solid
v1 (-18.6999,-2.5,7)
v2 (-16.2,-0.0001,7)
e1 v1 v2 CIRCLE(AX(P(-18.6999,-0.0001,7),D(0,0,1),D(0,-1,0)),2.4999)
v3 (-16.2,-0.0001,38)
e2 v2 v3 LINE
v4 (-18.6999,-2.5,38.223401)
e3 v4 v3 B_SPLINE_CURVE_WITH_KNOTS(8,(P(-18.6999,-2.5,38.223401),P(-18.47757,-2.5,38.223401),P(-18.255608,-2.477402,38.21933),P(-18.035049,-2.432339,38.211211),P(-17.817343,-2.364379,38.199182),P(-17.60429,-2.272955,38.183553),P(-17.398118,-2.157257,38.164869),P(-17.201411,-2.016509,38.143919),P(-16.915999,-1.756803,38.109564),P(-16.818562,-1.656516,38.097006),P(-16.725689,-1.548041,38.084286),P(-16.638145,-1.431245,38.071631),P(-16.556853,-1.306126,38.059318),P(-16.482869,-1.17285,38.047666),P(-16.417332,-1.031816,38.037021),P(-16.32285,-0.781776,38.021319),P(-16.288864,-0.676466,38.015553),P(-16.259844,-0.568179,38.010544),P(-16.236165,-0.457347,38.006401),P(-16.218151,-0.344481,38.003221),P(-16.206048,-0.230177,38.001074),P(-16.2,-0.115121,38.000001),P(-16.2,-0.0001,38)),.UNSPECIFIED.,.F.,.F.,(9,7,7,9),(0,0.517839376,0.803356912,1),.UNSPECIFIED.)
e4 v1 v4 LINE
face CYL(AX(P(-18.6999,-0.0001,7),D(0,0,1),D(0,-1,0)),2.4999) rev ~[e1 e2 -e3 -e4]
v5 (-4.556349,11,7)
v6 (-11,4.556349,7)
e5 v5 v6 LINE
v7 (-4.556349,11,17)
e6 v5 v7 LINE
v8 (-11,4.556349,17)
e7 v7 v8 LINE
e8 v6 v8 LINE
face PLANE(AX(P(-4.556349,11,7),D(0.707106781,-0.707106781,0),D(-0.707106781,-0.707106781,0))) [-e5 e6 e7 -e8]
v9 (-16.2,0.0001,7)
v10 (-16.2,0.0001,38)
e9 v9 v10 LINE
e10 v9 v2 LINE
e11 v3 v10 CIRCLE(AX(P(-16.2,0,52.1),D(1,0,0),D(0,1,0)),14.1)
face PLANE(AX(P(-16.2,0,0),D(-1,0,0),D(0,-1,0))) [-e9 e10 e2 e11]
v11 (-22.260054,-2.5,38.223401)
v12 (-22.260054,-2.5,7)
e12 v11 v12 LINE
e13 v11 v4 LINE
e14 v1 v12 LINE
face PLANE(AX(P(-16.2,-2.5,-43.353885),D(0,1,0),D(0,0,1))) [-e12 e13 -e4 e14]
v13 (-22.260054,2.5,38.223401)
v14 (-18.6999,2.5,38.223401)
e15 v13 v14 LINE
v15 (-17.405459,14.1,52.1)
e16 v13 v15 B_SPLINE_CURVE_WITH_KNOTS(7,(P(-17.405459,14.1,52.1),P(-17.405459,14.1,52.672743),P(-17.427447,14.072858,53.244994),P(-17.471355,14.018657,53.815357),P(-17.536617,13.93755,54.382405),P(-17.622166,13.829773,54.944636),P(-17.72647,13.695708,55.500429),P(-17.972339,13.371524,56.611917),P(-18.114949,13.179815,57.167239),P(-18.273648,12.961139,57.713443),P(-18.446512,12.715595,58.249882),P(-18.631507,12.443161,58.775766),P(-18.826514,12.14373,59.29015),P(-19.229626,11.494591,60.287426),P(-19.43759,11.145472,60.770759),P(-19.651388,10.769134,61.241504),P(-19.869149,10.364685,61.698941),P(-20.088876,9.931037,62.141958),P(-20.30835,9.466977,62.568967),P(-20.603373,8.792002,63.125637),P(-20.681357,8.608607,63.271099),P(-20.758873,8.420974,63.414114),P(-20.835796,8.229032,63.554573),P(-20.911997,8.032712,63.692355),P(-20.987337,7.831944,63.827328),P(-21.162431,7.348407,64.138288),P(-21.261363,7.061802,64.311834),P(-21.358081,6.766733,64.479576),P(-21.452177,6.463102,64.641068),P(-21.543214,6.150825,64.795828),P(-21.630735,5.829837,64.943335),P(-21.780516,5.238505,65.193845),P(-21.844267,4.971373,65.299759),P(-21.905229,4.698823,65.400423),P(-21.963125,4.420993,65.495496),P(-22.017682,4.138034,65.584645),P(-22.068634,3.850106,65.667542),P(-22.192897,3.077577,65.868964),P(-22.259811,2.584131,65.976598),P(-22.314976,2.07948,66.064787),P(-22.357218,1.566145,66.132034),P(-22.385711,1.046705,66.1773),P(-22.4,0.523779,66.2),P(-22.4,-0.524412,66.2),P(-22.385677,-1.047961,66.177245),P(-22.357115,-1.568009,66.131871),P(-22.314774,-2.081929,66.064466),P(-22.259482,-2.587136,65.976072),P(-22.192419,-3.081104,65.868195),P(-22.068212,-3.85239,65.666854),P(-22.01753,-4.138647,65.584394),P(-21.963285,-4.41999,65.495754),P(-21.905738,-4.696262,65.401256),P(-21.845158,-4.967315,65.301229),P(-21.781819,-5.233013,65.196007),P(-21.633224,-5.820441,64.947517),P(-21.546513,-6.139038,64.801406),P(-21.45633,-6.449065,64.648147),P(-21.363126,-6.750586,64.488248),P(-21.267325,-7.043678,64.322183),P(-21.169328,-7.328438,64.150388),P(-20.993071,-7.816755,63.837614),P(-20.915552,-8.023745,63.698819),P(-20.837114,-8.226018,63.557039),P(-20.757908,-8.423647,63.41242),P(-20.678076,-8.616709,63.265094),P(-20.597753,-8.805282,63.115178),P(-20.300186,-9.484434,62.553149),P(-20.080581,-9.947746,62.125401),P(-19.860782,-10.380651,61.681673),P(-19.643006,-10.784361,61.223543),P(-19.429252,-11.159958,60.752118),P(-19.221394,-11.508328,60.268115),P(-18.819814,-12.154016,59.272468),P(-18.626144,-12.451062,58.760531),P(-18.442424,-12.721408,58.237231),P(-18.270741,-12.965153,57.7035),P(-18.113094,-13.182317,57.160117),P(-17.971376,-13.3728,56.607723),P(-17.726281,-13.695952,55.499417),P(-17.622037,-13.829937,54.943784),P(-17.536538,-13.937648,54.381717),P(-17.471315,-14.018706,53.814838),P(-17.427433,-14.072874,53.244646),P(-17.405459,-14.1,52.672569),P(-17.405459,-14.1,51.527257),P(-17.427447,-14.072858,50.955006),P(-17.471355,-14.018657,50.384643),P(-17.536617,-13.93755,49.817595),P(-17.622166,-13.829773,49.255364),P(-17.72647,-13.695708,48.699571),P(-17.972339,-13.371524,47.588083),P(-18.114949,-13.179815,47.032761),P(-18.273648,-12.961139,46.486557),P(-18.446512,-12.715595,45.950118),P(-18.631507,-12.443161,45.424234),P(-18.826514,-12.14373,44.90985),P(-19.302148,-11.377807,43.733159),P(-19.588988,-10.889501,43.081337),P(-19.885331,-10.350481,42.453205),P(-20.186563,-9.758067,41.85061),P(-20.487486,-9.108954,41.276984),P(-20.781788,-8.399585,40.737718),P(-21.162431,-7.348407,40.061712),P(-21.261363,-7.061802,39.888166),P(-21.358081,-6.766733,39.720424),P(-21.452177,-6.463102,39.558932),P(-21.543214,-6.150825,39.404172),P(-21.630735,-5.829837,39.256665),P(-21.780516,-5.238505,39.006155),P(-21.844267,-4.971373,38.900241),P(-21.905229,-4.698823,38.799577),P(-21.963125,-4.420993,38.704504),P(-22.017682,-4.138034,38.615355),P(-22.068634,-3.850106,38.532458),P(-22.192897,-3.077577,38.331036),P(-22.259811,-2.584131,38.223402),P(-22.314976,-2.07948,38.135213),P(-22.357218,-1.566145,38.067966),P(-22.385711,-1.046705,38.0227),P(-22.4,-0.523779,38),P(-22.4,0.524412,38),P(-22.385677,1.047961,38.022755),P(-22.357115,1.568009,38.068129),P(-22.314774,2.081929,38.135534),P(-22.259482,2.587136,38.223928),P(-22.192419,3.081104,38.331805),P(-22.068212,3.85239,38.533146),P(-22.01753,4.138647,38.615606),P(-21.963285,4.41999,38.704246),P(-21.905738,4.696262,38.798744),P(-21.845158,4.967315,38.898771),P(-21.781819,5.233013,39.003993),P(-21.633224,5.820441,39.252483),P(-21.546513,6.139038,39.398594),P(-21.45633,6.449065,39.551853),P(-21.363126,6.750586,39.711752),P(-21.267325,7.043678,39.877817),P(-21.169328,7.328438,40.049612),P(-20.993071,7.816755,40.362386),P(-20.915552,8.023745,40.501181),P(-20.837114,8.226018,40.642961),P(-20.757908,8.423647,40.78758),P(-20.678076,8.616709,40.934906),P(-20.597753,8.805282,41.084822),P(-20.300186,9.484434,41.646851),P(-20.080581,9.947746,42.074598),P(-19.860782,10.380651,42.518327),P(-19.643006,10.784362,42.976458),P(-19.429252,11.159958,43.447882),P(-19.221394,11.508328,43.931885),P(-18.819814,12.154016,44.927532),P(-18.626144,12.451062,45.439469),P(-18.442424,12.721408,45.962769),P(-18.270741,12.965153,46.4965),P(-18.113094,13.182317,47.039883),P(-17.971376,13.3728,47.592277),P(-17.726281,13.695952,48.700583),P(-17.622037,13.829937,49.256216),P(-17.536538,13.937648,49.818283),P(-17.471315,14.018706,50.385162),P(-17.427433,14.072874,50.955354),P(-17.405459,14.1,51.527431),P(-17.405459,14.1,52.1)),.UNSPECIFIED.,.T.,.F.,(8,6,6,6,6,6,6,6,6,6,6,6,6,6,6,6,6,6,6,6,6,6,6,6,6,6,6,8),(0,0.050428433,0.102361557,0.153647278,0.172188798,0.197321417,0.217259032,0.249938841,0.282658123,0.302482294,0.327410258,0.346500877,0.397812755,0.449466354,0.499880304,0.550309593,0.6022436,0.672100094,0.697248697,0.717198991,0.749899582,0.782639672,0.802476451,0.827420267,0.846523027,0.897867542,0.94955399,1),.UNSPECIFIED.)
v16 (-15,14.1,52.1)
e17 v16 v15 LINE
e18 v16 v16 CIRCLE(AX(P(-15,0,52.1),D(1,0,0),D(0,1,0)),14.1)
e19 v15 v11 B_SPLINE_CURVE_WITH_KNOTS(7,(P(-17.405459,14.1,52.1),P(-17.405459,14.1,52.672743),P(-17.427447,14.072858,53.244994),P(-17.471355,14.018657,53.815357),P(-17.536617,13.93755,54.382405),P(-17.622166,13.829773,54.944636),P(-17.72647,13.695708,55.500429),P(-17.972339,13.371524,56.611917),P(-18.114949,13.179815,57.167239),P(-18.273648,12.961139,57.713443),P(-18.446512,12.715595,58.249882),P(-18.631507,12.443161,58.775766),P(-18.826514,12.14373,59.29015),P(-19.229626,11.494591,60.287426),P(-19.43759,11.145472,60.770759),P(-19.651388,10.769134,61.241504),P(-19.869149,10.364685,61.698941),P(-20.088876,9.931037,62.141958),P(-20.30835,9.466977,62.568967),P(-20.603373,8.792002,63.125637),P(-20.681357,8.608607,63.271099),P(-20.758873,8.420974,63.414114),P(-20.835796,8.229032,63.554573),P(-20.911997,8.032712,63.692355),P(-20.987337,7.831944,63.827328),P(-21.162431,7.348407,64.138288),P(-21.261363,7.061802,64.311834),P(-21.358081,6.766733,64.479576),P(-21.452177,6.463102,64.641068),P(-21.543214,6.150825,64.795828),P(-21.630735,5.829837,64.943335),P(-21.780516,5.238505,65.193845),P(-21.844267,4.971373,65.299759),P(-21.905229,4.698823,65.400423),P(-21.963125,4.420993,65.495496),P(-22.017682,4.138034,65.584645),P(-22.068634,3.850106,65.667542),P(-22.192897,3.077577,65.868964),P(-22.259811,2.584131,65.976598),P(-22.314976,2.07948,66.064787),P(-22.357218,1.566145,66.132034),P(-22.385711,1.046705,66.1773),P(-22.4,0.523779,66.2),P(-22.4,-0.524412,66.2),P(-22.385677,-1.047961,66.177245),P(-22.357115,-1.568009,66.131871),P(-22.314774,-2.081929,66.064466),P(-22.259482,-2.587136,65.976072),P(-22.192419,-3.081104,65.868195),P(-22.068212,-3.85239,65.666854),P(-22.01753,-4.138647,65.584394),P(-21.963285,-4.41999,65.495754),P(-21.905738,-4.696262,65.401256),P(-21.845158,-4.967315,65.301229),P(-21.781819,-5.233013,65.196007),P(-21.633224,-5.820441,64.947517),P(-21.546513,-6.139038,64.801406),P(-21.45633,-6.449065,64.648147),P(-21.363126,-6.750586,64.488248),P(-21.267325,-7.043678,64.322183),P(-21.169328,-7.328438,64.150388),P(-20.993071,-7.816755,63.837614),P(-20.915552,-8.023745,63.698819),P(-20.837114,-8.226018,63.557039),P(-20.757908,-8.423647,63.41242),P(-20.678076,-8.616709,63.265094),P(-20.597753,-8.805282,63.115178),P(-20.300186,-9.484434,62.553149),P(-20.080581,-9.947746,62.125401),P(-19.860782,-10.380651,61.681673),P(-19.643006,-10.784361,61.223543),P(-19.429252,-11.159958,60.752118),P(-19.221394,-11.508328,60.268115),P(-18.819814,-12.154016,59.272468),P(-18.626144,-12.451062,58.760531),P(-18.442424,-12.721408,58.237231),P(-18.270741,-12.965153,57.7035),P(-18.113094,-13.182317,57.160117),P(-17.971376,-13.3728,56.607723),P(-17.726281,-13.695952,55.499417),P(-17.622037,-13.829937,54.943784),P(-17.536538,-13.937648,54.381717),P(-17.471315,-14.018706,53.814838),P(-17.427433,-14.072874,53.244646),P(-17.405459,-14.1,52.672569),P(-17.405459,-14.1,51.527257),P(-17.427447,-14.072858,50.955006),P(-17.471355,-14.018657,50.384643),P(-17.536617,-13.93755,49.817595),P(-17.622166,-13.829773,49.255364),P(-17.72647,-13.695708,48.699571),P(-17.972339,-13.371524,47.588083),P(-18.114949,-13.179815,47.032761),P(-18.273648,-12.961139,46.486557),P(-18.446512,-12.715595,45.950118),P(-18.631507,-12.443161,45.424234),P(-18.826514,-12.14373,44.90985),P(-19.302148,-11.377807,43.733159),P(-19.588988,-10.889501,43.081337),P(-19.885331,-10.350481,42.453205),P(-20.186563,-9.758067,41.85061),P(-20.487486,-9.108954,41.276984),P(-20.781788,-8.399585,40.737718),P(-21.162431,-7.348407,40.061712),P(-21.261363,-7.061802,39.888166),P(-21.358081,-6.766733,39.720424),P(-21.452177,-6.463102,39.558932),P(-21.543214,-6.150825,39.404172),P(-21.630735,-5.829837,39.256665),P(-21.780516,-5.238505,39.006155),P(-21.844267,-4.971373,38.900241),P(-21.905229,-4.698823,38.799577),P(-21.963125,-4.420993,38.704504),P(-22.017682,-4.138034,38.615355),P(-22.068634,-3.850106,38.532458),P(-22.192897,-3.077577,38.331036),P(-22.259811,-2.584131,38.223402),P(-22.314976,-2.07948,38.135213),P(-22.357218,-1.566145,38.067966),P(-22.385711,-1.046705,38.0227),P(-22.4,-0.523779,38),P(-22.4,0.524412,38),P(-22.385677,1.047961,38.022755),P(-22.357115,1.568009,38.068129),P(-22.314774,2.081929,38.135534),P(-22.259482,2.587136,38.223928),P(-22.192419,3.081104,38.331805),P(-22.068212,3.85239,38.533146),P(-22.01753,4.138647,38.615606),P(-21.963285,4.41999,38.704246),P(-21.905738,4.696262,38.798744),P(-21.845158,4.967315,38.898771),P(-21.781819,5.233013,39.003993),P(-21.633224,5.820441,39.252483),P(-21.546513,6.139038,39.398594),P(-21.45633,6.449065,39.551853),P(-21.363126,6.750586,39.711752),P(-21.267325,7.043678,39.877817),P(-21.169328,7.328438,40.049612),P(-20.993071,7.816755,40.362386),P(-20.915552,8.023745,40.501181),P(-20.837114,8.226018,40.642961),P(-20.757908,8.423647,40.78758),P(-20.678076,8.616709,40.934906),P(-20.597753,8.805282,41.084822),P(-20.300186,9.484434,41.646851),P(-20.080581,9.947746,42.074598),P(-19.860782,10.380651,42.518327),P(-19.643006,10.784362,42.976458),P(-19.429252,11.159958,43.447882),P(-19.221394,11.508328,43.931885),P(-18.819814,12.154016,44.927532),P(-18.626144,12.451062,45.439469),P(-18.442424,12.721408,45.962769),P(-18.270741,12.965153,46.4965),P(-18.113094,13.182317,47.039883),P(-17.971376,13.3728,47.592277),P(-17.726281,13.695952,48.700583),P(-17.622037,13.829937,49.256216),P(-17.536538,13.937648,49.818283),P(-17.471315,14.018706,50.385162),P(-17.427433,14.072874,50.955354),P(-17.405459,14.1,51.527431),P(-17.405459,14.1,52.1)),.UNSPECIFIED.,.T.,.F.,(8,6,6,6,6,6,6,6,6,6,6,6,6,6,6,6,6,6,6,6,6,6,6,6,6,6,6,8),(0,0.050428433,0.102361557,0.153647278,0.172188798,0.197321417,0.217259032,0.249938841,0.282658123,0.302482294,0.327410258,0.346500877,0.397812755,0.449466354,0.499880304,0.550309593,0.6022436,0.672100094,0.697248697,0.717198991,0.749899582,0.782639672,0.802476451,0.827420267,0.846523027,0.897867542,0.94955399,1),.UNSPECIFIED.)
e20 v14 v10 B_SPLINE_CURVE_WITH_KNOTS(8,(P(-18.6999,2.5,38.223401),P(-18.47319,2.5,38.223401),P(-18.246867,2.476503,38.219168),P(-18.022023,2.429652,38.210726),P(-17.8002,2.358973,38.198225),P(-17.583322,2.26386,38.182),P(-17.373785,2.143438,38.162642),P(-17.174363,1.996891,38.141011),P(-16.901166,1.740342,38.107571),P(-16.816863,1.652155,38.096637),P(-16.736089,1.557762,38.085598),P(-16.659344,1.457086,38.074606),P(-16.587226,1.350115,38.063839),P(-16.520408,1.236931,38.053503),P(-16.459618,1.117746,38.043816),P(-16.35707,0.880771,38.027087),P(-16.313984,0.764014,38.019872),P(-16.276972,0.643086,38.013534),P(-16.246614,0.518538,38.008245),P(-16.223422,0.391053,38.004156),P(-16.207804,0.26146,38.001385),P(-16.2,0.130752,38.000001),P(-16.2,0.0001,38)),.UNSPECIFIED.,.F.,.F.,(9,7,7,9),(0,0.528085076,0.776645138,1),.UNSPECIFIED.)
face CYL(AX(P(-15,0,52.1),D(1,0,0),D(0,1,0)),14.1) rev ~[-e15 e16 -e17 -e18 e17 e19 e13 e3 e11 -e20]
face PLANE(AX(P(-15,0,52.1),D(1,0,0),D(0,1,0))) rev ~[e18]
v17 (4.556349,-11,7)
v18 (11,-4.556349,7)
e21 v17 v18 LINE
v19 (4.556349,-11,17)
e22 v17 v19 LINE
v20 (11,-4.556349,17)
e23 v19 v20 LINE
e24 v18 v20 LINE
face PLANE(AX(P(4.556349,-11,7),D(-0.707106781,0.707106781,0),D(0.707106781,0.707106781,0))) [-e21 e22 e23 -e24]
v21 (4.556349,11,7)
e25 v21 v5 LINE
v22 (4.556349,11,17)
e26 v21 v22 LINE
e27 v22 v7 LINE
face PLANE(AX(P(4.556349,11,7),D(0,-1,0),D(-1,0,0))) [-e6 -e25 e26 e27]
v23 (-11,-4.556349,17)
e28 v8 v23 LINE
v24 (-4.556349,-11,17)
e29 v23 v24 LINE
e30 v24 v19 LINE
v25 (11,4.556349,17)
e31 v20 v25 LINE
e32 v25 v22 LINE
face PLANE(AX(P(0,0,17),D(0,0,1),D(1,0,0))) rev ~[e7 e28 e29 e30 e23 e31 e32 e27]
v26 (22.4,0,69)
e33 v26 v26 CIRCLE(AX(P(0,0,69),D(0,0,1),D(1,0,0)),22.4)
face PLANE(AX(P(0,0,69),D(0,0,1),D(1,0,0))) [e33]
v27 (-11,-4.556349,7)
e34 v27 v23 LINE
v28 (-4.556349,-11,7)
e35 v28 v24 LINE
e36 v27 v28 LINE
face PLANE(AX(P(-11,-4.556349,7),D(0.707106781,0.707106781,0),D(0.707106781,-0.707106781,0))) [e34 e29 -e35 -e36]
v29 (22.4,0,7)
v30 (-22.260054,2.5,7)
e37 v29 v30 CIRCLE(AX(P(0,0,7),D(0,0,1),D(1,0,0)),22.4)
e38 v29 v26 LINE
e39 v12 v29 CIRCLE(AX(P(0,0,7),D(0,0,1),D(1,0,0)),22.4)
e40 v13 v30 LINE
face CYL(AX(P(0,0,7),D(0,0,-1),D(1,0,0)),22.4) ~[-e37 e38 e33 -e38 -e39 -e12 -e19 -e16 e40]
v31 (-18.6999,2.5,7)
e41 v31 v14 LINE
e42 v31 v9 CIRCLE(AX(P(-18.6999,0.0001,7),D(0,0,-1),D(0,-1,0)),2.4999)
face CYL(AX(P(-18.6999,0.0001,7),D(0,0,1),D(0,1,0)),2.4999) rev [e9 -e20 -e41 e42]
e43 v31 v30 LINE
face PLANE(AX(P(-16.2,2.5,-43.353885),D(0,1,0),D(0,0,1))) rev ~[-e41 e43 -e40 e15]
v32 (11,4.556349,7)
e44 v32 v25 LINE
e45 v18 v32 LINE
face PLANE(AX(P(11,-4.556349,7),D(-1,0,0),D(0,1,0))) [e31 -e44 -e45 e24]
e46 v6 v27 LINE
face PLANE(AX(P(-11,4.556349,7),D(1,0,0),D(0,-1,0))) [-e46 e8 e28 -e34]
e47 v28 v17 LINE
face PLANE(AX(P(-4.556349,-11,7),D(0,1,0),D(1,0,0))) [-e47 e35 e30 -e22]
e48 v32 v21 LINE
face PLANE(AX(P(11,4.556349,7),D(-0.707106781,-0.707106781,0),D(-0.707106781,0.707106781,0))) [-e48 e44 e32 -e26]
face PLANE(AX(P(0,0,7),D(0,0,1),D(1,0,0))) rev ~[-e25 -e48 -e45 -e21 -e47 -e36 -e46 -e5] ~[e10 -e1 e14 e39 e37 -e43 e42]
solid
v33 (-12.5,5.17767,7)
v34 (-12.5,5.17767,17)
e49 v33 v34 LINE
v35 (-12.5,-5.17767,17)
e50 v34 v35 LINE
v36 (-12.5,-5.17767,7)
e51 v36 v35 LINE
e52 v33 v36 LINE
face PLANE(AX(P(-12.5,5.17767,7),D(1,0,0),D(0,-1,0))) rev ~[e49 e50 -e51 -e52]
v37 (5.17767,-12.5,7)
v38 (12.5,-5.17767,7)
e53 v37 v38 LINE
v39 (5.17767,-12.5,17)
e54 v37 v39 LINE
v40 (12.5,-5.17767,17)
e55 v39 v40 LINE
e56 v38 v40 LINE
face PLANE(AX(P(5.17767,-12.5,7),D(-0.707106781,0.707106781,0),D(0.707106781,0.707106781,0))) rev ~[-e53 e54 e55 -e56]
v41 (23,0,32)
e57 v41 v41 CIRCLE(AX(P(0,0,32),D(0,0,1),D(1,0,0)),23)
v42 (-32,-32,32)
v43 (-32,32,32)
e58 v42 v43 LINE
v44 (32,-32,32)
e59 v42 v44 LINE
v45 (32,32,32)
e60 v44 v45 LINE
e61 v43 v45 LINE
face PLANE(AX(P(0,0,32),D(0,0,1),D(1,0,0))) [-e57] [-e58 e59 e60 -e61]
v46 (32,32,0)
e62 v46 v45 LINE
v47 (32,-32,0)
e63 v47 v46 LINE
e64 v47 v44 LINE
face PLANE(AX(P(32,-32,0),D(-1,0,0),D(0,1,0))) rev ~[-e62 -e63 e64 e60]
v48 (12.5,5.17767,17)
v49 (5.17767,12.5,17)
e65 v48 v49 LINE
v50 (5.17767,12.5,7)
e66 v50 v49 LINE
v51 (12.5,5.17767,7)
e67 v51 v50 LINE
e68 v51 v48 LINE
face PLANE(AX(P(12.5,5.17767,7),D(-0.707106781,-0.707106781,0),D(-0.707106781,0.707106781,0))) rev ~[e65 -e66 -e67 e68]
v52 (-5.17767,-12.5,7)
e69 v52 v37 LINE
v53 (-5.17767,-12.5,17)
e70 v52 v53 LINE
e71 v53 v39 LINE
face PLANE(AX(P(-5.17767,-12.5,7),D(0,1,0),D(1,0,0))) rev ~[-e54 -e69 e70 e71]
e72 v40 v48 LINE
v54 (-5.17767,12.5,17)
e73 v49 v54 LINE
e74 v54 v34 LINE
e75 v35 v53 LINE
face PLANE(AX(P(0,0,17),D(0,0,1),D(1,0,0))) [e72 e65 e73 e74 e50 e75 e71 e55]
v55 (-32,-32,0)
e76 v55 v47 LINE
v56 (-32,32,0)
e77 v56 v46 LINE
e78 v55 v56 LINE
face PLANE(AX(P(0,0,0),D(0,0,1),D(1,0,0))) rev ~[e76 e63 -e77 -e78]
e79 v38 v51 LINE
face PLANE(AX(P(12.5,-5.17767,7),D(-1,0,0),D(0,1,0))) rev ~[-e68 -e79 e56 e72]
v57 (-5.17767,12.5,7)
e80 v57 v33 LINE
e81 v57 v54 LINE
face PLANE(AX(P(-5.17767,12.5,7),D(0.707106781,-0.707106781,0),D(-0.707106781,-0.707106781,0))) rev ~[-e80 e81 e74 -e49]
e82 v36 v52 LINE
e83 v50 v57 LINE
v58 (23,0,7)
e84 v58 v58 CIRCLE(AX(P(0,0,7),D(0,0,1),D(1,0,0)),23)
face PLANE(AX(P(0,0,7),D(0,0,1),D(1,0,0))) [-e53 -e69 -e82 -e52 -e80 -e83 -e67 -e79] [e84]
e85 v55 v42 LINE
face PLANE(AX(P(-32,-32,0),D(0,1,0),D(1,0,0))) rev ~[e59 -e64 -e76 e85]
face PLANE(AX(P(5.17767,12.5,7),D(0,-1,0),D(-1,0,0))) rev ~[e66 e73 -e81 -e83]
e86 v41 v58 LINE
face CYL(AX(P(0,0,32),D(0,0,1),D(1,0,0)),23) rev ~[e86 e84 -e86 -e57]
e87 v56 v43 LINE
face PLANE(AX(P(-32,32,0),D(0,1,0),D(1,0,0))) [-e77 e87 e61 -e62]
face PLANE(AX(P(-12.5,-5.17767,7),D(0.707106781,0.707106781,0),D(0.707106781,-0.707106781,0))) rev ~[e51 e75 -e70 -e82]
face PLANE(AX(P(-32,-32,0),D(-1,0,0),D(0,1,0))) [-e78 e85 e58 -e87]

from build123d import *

# Parameters (mm, degrees)
F0_W      = 64
F0_H      = 64
F1_DEPTH  = 32
F2_R      = 23
F3_DEPTH  = 25
F5_R      = 22.4
F6_DEPTH  = 62
F8_START  = -15
F7_R      = 14.1
F8_DEPTH  = 22.8
F10_START = 1.2
F9_W      = 5
F9_H      = 86.7077708244
F10_DEPTH = 23.8
F11_R     = 2.4999
F13_DEPTH = 10
F15_DEPTH = 10


# Not quite as in the source:
# - a fillet or chamfer is up to 0.001 mm smaller than in the source, because OpenCascade refuses the exact size


with BuildPart() as f1:
    # F0 (on Top) → F1 (new body)
    with BuildSketch(Plane.XY):
        Rectangle(F0_W, F0_H)
    extrude(amount=F1_DEPTH)

    # F2 (on face) → F3 (cut)
    with BuildSketch(Plane.XY.offset(32)):
        Circle(F2_R)
    extrude(amount=-F3_DEPTH, mode=Mode.SUBTRACT)

    # F14 (on face) → F15 (join)
    with BuildSketch(Plane.XY.offset(7)):
        Polygon((5.1776695297, 12.5), (-5.1776695297, 12.5), (-12.5, 5.1776695297), (-12.5, -5.1776695297), (-5.1776695297, -12.5), (5.1776695297, -12.5), (12.5, -5.1776695297), (12.5, 5.1776695297), align=None)
    extrude(amount=F15_DEPTH)


with BuildPart() as f6:
    # F5 (on face) → F6 (new body)
    with BuildSketch(Plane.XY.offset(7)):
        Circle(F5_R)
    extrude(amount=F6_DEPTH)

    # F7 (on Right) → F8 (cut)
    with BuildSketch(Plane.YZ.offset(F8_START)):
        with Locations((0, 52.1)):
            Circle(F7_R)
    extrude(amount=-F8_DEPTH, mode=Mode.SUBTRACT)

    # F9 (on face) → F10 (cut)
    with BuildSketch(Plane(origin=(-15, 0, 0), x_dir=(0, -1, 0), z_dir=(-1, 0, 0)).offset(F10_START)):
        Rectangle(F9_W, F9_H)
    extrude(amount=F10_DEPTH, mode=Mode.SUBTRACT)

    # F11 (radius 2.5 in the source; OpenCascade refuses exactly that, so slightly less here)
    f11_edges = [f6.edges().sort_by_distance(p)[0] for p in [
        (-16.2, 2.5, 22.6117),
        (-16.2, -2.5, 22.6117),
    ]]
    fillet(f11_edges, radius=F11_R)

    # F12 (on face) → F13 (cut)
    with BuildSketch(Plane.XY.offset(7)):
        Polygon((11, -4.5563491861), (11, 4.5563491861), (4.5563491861, 11), (-4.5563491861, 11), (-11, 4.5563491861), (-11, -4.5563491861), (-4.5563491861, -11), (4.5563491861, -11), align=None)
    extrude(amount=F13_DEPTH, mode=Mode.SUBTRACT)


solid = Compound([f1.part, f6.part])
